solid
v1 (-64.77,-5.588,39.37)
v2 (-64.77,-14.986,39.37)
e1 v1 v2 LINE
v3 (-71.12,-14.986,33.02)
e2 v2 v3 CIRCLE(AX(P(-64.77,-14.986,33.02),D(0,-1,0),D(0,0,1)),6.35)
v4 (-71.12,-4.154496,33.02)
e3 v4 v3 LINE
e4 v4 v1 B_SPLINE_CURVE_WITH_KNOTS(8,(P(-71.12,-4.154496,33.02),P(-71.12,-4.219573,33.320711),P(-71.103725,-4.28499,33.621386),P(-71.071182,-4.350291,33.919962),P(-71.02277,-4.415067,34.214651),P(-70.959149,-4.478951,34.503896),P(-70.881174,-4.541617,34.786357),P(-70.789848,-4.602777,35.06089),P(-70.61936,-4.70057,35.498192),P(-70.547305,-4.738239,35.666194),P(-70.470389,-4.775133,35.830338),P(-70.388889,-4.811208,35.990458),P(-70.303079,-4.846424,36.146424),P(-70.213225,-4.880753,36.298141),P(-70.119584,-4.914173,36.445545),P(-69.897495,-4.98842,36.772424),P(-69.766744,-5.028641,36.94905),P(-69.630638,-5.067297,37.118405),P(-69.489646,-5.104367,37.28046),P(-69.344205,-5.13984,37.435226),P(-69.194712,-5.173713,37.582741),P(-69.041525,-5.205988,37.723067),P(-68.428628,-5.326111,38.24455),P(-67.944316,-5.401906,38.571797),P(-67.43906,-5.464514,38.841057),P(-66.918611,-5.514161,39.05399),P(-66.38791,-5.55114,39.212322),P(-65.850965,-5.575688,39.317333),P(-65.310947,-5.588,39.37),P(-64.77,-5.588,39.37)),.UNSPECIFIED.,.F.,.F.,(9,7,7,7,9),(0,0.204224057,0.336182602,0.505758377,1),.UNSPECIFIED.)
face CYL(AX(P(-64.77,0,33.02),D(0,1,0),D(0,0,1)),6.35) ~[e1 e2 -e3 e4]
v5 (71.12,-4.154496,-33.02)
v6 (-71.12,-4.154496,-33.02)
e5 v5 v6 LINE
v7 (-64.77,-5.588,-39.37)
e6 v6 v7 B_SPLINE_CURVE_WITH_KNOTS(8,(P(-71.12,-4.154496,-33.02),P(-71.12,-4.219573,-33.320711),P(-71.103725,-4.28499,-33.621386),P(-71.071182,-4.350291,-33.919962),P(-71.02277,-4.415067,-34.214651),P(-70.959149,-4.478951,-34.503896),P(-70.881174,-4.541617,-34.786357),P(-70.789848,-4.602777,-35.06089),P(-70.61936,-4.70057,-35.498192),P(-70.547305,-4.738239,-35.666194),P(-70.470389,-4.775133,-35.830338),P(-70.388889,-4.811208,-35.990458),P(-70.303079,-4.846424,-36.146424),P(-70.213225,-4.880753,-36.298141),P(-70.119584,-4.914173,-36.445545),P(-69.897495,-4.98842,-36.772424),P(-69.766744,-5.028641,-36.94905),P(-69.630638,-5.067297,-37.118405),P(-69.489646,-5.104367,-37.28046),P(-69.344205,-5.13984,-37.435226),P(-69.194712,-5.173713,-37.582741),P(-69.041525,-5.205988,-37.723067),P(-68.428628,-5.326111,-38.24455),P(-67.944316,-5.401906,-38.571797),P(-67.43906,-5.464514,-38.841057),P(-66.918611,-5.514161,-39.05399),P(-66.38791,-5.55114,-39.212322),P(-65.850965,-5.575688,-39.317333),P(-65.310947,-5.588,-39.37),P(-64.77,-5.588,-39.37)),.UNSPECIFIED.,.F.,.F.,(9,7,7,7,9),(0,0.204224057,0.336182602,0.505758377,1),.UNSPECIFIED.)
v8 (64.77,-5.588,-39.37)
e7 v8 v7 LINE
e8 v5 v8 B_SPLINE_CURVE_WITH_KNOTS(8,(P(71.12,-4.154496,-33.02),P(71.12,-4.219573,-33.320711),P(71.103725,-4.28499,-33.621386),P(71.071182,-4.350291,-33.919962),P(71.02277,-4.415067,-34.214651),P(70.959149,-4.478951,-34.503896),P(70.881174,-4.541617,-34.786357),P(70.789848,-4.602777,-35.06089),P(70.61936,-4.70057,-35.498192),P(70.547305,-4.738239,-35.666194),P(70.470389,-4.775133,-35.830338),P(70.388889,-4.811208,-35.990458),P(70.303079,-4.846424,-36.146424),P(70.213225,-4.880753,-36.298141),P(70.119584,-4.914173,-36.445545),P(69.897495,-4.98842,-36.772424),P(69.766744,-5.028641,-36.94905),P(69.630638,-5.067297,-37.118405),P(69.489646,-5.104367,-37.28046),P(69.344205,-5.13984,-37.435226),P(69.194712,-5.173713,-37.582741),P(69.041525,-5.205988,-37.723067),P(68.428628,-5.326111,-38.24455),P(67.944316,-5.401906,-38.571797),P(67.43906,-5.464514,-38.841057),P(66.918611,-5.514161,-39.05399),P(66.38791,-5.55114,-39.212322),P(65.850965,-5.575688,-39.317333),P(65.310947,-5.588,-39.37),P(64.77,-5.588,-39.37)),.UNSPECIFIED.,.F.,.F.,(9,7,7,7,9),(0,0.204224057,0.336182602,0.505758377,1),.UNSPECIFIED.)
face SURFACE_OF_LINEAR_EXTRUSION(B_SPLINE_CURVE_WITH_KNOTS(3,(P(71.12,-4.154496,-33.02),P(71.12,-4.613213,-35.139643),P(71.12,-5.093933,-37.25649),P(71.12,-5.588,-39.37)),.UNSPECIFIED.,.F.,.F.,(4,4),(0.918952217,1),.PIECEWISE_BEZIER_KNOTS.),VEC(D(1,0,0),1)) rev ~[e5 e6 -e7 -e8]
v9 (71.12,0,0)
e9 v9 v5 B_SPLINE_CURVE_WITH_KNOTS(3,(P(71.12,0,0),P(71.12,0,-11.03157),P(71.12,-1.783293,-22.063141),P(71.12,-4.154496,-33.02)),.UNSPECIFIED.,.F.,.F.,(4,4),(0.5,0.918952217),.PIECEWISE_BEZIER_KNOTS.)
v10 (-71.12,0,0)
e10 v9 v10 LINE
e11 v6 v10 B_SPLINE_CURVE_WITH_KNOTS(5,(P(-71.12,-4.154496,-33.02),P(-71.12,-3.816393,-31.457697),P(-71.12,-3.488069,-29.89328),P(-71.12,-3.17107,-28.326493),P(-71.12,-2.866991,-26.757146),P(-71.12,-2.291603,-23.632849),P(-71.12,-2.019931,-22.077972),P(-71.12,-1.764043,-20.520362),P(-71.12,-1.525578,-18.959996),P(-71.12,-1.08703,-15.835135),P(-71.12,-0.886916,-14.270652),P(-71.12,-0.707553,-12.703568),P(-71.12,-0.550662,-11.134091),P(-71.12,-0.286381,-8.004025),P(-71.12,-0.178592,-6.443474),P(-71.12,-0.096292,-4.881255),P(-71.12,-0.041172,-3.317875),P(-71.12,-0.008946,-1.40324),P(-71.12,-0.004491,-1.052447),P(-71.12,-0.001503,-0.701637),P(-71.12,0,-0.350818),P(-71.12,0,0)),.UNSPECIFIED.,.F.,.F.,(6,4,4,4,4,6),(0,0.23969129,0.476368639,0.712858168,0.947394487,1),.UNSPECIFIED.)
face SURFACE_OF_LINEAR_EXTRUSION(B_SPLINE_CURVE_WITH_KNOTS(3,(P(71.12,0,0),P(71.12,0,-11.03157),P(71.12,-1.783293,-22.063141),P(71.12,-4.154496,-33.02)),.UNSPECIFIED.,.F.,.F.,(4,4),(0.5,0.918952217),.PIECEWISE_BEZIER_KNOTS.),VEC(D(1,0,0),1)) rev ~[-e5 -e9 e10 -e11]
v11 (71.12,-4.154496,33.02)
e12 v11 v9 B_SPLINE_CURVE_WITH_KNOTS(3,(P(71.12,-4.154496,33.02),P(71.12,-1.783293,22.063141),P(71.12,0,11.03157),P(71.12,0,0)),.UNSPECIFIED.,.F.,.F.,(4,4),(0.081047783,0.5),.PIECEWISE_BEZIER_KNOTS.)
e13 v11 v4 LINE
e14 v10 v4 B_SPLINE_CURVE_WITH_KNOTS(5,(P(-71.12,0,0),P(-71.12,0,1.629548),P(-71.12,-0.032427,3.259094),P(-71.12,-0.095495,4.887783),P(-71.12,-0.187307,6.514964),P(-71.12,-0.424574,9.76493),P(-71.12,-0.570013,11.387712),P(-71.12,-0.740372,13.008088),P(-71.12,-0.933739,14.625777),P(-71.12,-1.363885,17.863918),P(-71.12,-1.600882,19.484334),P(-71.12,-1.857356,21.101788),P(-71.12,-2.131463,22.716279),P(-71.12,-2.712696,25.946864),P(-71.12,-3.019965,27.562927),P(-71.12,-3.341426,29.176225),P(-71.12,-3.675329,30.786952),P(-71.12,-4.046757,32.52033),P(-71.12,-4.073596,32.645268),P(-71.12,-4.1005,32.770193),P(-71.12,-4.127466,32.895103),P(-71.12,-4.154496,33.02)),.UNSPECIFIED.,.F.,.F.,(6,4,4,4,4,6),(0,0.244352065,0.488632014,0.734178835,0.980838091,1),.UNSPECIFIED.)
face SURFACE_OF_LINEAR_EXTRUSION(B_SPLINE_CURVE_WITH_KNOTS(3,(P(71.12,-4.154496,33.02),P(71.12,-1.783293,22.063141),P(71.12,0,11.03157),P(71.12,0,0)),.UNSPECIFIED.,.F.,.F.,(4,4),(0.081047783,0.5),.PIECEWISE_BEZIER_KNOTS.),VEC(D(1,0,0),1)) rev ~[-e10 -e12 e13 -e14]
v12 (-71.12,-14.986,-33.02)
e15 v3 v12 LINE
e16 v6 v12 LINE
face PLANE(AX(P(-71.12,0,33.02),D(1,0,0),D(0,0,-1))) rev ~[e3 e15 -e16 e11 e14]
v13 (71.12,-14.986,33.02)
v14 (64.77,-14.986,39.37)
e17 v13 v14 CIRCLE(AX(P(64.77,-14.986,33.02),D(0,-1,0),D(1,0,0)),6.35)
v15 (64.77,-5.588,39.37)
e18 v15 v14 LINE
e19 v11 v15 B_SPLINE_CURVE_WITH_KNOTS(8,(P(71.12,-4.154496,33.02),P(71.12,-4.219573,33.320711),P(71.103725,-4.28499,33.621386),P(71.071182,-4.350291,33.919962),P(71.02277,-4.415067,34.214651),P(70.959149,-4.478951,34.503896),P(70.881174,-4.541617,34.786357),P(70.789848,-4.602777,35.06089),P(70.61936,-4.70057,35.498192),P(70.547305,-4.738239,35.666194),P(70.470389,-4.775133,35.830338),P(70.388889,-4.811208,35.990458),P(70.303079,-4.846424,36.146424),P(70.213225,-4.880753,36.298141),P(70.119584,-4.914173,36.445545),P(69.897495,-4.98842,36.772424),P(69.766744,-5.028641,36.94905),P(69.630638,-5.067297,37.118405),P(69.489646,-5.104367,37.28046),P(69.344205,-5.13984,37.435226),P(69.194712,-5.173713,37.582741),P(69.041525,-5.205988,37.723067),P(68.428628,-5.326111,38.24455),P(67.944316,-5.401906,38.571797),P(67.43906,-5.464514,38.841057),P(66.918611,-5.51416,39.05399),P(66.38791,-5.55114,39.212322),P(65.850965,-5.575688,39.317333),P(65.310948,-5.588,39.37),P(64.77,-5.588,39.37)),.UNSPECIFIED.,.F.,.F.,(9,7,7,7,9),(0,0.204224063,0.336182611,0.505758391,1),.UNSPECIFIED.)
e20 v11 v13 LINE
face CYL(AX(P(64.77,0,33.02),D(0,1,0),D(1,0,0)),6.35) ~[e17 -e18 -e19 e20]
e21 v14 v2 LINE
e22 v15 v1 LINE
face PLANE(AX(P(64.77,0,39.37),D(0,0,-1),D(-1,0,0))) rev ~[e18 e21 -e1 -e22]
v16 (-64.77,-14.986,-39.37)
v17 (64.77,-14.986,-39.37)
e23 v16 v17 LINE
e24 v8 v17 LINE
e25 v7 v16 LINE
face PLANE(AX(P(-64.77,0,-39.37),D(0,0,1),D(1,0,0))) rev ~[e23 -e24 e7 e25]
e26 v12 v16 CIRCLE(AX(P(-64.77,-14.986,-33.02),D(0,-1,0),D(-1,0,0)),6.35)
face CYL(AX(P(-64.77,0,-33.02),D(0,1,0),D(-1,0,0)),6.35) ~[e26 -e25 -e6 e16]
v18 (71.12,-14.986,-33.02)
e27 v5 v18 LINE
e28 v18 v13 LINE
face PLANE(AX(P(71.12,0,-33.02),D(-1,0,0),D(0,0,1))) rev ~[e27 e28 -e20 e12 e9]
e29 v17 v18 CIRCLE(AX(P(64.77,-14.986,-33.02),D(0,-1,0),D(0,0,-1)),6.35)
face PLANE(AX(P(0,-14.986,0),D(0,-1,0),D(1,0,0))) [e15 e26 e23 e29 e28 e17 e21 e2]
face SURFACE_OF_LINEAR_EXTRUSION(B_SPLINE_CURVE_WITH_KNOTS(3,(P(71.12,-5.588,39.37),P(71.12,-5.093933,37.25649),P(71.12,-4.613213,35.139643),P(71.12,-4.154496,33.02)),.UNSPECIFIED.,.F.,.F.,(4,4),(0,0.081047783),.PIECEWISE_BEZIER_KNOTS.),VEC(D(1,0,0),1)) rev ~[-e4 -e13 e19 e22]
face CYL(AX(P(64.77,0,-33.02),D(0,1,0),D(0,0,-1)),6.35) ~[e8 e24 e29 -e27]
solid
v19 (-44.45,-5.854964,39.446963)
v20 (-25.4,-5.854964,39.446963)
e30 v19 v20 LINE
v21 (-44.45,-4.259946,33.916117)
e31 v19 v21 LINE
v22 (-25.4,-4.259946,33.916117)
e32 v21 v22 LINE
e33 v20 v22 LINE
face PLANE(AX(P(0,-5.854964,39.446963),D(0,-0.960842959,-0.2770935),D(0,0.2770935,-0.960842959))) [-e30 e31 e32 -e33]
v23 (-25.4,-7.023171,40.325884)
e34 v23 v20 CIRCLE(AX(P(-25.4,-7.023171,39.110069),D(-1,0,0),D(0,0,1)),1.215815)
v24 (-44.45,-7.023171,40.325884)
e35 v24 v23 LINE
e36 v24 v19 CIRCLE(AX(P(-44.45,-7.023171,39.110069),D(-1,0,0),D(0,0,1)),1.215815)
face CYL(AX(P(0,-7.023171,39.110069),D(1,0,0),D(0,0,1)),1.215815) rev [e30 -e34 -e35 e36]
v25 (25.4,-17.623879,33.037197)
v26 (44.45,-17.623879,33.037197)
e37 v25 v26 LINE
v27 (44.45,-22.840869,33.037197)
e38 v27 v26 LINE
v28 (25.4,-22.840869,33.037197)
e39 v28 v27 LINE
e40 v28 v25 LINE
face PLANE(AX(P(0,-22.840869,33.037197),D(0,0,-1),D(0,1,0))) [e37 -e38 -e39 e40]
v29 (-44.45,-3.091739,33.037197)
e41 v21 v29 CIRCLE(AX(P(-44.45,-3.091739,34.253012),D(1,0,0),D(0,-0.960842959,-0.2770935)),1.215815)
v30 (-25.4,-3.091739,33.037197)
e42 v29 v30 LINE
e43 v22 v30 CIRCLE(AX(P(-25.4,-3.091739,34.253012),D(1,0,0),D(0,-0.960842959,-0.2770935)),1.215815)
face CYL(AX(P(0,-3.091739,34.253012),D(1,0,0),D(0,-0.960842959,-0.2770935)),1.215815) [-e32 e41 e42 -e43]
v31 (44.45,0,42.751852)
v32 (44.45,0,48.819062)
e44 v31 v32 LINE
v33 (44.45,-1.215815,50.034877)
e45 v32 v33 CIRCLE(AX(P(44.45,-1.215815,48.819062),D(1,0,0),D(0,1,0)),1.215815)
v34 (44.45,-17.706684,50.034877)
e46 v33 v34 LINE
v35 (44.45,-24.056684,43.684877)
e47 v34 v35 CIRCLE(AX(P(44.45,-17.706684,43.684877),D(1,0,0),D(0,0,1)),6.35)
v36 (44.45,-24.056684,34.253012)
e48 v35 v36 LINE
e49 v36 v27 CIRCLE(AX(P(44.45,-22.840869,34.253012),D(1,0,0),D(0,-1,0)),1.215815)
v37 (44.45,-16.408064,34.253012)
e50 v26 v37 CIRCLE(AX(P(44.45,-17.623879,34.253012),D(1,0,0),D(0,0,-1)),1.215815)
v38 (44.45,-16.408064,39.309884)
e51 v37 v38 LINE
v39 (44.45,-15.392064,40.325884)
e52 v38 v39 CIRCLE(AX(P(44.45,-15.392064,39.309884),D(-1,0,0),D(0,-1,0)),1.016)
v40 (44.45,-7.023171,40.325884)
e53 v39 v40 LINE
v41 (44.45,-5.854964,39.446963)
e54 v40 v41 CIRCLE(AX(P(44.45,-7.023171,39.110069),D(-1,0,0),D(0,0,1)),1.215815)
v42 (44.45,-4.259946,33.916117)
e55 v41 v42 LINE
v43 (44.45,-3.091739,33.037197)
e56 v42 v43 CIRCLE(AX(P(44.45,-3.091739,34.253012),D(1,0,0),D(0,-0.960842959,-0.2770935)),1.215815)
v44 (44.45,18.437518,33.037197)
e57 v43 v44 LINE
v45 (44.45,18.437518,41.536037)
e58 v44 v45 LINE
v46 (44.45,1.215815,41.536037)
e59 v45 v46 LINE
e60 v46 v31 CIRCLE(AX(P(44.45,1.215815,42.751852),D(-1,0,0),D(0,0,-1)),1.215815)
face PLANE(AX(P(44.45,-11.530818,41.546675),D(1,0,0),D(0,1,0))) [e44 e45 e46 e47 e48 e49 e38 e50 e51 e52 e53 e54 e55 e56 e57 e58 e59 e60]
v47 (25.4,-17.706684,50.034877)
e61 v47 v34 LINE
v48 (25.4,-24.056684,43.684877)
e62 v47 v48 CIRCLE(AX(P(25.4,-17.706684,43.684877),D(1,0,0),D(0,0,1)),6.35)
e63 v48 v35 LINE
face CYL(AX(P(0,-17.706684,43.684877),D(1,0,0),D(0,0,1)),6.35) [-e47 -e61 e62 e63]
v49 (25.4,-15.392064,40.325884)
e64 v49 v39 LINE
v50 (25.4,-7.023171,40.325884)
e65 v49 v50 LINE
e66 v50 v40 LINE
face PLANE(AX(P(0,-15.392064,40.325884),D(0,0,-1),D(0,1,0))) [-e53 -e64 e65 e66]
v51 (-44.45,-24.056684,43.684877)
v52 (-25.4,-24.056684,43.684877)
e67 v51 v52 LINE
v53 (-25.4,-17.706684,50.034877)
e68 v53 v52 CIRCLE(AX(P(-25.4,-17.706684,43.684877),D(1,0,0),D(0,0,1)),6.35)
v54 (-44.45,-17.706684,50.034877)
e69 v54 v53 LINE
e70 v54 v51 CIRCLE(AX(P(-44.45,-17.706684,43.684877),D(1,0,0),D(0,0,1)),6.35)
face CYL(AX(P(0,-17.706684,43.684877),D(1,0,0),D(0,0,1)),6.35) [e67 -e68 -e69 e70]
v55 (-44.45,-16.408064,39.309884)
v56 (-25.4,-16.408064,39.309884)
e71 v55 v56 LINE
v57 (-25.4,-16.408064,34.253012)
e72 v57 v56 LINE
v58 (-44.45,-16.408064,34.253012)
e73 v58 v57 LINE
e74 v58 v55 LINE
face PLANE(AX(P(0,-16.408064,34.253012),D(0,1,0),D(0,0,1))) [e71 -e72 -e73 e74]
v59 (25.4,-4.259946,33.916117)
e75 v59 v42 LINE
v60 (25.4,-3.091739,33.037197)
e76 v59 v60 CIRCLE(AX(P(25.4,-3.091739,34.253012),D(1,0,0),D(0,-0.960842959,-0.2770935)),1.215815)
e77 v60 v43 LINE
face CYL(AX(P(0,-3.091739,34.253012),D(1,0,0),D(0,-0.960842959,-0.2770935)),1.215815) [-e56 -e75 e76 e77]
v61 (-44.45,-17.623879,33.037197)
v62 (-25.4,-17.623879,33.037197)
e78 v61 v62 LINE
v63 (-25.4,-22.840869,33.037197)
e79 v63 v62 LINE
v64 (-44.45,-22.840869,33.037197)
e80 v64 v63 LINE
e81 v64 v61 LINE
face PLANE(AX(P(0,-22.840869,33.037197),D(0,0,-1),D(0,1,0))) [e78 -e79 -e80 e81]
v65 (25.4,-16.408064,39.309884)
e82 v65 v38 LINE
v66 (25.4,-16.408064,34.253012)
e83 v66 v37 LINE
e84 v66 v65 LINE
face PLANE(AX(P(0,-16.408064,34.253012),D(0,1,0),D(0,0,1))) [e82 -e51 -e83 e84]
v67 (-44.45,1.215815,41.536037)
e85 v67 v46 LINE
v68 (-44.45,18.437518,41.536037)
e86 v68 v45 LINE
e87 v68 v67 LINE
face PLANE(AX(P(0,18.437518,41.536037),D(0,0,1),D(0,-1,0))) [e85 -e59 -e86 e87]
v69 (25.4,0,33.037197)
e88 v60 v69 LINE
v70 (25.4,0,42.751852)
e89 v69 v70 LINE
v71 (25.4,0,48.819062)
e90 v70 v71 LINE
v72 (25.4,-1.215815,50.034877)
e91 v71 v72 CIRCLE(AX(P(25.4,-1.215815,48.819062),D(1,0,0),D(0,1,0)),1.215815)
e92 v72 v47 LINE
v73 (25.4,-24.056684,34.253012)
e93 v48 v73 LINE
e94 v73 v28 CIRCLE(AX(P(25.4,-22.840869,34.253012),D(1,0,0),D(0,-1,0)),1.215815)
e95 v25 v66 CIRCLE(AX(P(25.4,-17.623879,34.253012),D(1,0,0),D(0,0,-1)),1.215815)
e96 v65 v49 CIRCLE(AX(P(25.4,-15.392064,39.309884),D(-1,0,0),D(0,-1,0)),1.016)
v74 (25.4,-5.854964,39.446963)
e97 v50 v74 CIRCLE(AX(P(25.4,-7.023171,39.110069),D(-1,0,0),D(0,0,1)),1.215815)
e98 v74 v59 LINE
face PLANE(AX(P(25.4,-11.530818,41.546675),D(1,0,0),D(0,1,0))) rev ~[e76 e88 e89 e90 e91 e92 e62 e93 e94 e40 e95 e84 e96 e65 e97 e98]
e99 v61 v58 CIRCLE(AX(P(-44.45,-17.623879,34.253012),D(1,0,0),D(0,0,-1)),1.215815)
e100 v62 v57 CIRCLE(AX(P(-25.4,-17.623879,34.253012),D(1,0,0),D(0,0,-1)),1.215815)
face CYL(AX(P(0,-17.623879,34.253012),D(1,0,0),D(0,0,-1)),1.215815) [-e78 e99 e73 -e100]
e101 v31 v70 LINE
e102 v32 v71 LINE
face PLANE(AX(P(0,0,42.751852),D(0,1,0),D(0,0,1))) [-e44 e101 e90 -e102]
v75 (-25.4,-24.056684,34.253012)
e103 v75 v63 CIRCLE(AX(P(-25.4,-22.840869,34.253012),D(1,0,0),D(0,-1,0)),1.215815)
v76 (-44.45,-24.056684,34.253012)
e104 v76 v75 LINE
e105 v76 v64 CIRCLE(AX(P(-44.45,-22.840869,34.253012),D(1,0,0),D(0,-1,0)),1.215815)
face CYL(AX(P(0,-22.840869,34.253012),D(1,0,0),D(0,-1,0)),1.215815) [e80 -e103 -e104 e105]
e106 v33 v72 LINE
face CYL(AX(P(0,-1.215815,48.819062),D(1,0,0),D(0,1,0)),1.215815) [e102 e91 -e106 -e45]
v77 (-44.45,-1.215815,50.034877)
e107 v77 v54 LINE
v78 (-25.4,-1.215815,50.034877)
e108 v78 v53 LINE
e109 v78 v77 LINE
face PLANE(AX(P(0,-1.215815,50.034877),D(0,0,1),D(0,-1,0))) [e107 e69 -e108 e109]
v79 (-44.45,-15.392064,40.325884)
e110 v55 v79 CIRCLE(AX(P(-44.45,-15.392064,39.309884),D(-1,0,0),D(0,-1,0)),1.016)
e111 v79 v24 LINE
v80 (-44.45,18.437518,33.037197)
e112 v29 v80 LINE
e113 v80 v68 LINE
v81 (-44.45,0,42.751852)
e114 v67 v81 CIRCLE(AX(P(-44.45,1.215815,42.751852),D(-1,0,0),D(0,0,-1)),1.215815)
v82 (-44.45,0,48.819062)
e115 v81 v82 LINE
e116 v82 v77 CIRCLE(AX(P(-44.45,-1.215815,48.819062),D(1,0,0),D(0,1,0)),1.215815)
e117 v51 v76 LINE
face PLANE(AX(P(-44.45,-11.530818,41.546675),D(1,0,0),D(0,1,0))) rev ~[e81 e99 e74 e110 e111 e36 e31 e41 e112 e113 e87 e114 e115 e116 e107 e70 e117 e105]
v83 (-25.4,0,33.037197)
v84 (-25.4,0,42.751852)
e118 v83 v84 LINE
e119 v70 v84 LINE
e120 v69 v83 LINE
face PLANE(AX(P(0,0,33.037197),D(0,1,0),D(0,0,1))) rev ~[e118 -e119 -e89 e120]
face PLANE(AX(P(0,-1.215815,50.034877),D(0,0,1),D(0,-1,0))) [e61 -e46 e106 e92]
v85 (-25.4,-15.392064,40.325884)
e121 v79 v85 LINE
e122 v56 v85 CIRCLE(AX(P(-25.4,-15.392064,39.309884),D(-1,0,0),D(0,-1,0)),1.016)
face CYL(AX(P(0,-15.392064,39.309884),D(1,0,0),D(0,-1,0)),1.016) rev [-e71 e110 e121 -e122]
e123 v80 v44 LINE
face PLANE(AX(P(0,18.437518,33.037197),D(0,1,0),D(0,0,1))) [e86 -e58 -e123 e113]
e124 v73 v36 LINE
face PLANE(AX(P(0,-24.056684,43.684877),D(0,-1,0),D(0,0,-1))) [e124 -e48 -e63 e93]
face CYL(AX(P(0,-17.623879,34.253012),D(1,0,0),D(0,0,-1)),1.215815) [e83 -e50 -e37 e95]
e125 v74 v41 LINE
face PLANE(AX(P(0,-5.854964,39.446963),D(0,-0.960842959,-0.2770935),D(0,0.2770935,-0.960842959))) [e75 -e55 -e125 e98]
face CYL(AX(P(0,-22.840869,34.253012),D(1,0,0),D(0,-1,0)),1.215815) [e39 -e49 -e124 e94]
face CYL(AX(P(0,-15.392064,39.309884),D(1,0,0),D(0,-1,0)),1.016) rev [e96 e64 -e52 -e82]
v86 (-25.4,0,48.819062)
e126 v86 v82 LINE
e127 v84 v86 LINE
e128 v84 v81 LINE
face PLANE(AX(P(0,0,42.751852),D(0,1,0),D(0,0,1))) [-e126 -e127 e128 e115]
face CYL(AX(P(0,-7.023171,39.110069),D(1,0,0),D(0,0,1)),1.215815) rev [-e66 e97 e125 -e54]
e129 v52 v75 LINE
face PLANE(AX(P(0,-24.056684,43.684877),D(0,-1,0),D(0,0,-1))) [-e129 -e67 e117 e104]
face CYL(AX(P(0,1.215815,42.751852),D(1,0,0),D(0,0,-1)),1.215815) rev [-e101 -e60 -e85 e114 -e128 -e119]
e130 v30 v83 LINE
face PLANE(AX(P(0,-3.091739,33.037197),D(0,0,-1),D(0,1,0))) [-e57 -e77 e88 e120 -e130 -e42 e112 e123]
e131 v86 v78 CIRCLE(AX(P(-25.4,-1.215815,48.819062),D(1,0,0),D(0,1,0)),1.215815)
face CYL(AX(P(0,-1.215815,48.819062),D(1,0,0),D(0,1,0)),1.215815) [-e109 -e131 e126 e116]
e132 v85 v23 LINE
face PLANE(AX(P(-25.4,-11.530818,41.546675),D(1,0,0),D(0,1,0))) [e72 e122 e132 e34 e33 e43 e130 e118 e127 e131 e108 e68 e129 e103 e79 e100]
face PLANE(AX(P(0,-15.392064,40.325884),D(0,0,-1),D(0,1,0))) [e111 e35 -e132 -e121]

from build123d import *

# Parameters (mm, degrees)
F1_DEPTH      = 14.986
F3_DEPTH      = 142.241
F5_DEPTH      = 44.45
F5_DEPTH_BACK = 44.45
F6_DEPTH      = 25.4
F6_DEPTH_BACK = 25.4


# Not quite as in the source:
# - a feature names something its author has since deleted; it is built from what else it names


with BuildPart() as f1:
    # F0 (on Front) → F1 (new body)
    with BuildSketch(Plane.XZ):
        with BuildLine():
            Line((-64.77, -39.37), (64.77, -39.37))
            ThreePointArc((64.77, -39.37), (69.2601280605, -37.5101280605), (71.12, -33.02))
            Line((71.12, -33.02), (71.12, 33.02))
            ThreePointArc((71.12, 33.02), (69.2601280605, 37.5101280605), (64.77, 39.37))
            Line((64.77, 39.37), (-64.77, 39.37))
            ThreePointArc((-64.77, 39.37), (-69.2601280605, 37.5101280605), (-71.12, 33.02))
            Line((-71.12, 33.02), (-71.12, -33.02))
            ThreePointArc((-71.12, -33.02), (-69.2601280605, -37.5101280605), (-64.77, -39.37))
        make_face()
    extrude(amount=F1_DEPTH)

    # F2 (on face) → F3 (cut, through all)
    with BuildSketch(Plane.YZ.offset(71.12)):
        with BuildLine():
            Line((0, 39.37), (-5.588, 39.37))
            add(Edge.make_bspline(
                [(-5.588, 39.37), (-5.0939327167, 37.2564899548), (-4.6132131193, 35.139642988), (-4.1544956107, 33.02)],
                knots=[0, 0, 0, 0, 0.0810477827, 0.0810477827, 0.0810477827, 0.0810477827], degree=3))
            Line((-4.1544956107, 33.02), (0, 33.02))
            Line((0, 33.02), (0, 39.37))
        make_face()
        with BuildLine():
            Line((0, 33.02), (-4.1544956107, 33.02))
            add(Edge.make_bspline(
                [(-4.1544956107, 33.02), (-1.7832929575, 22.0631409692), (0, 11.0315704846), (0, 0)],
                knots=[0.0810477827, 0.0810477827, 0.0810477827, 0.0810477827, 0.5, 0.5, 0.5, 0.5], degree=3))
            Line((0, 0), (0, 33.02))
        make_face()
        with BuildLine():
            Line((0, -33.02), (0, 0))
            add(Edge.make_bspline(
                [(0, 0), (0, -11.0315704846), (-1.7832929575, -22.0631409692), (-4.1544956107, -33.02)],
                knots=[0.5, 0.5, 0.5, 0.5, 0.9189522173, 0.9189522173, 0.9189522173, 0.9189522173], degree=3))
            Line((-4.1544956107, -33.02), (0, -33.02))
        make_face()
        with BuildLine():
            Line((0, -33.02), (-4.1544956107, -33.02))
            add(Edge.make_bspline(
                [(-4.1544956107, -33.02), (-4.6132131193, -35.139642988), (-5.0939327167, -37.2564899548), (-5.588, -39.37)],
                knots=[0.9189522173, 0.9189522173, 0.9189522173, 0.9189522173, 1, 1, 1, 1], degree=3))
            Line((-5.588, -39.37), (0, -39.37))
            Line((0, -39.37), (0, -39.1186140473))
            Line((0, -39.1186140473), (0, -33.02))
        make_face()
    extrude(amount=-F3_DEPTH, mode=Mode.SUBTRACT)


with BuildPart() as f5:
    # F4 (on Right) → F5 (new body, two sides)
    with BuildSketch(Plane.YZ) as f5_sk:
        with BuildLine():
            Line((-1.2158148456, 50.0348769128), (-17.7066842258, 50.0348769128))
            ThreePointArc((-17.7066842258, 50.0348769128), (-22.1968122863, 48.1750049734), (-24.0566842258, 43.6848769128))
            Line((-24.0566842258, 43.6848769128), (-24.0566842258, 34.2530116905))
            ThreePointArc((-24.0566842258, 34.2530116905), (-23.7005803022, 33.3933007684), (-22.8408693802, 33.0371968448))
            Line((-22.8408693802, 33.0371968448), (-17.6238791954, 33.0371968448))
            ThreePointArc((-17.6238791954, 33.0371968448), (-16.7641682733, 33.3933007684), (-16.4080643497, 34.2530116905))
            Line((-16.4080643497, 34.2530116905), (-16.4080643497, 39.3098837759))
            ThreePointArc((-16.4080643497, 39.3098837759), (-16.1104848394, 40.0283042656), (-15.3920643497, 40.3258837759))
            Line((-15.3920643497, 40.3258837759), (-7.023171001, 40.3258837759))
            ThreePointArc((-7.023171001, 40.3258837759), (-6.2922111741, 40.0816158774), (-5.8549638669, 39.4469633211))
            Line((-5.8549638669, 39.4469633211), (-4.2599462141, 33.9161172996))
            ThreePointArc((-4.2599462141, 33.9161172996), (-3.8226989069, 33.2814647434), (-3.09173908, 33.0371968448))
            Line((-3.09173908, 33.0371968448), (0, 33.0371968448))
            Line((0, 33.0371968448), (0, 41.5360368788))
            Line((0, 41.5360368788), (0, 42.7518517245))
            Line((0, 42.7518517245), (0, 44.9006222188))
            Line((0, 44.9006222188), (0, 48.8190620672))
            ThreePointArc((0, 48.8190620672), (-0.3561039236, 49.6787729892), (-1.2158148456, 50.0348769128))
        make_face()
        with BuildLine():
            ThreePointArc((1.2158148456, 41.5360368788), (0.3561039236, 41.8921408024), (0, 42.7518517245))
            Line((0, 42.7518517245), (0, 41.5360368788))
            Line((0, 41.5360368788), (1.2158148456, 41.5360368788))
        make_face()
        Polygon((18.4375178069, 41.5360368788), (1.2158148456, 41.5360368788), (0, 41.5360368788), (0, 33.0371968448), (18.4375178069, 33.0371968448), align=None)
    extrude(amount=F5_DEPTH)
    extrude(f5_sk.sketch, amount=-F5_DEPTH_BACK)

    # F4 (on Right) → F6 (cut, two sides)
    with BuildSketch(Plane.YZ) as f6_sk:
        with BuildLine():
            Line((-1.2158148456, 50.0348769128), (-17.7066842258, 50.0348769128))
            ThreePointArc((-17.7066842258, 50.0348769128), (-22.1968122863, 48.1750049734), (-24.0566842258, 43.6848769128))
            Line((-24.0566842258, 43.6848769128), (-24.0566842258, 34.2530116905))
            ThreePointArc((-24.0566842258, 34.2530116905), (-23.7005803022, 33.3933007684), (-22.8408693802, 33.0371968448))
            Line((-22.8408693802, 33.0371968448), (-17.6238791954, 33.0371968448))
            ThreePointArc((-17.6238791954, 33.0371968448), (-16.7641682733, 33.3933007684), (-16.4080643497, 34.2530116905))
            Line((-16.4080643497, 34.2530116905), (-16.4080643497, 39.3098837759))
            ThreePointArc((-16.4080643497, 39.3098837759), (-16.1104848394, 40.0283042656), (-15.3920643497, 40.3258837759))
            Line((-15.3920643497, 40.3258837759), (-7.023171001, 40.3258837759))
            ThreePointArc((-7.023171001, 40.3258837759), (-6.2922111741, 40.0816158774), (-5.8549638669, 39.4469633211))
            Line((-5.8549638669, 39.4469633211), (-4.2599462141, 33.9161172996))
            ThreePointArc((-4.2599462141, 33.9161172996), (-3.8226989069, 33.2814647434), (-3.09173908, 33.0371968448))
            Line((-3.09173908, 33.0371968448), (0, 33.0371968448))
            Line((0, 33.0371968448), (0, 41.5360368788))
            Line((0, 41.5360368788), (0, 42.7518517245))
            Line((0, 42.7518517245), (0, 44.9006222188))
            Line((0, 44.9006222188), (0, 48.8190620672))
            ThreePointArc((0, 48.8190620672), (-0.3561039236, 49.6787729892), (-1.2158148456, 50.0348769128))
        make_face()
    extrude(amount=-F6_DEPTH, mode=Mode.SUBTRACT)
    extrude(f6_sk.sketch, amount=F6_DEPTH_BACK, mode=Mode.SUBTRACT)


solid = Compound([f1.part, f5.part])
